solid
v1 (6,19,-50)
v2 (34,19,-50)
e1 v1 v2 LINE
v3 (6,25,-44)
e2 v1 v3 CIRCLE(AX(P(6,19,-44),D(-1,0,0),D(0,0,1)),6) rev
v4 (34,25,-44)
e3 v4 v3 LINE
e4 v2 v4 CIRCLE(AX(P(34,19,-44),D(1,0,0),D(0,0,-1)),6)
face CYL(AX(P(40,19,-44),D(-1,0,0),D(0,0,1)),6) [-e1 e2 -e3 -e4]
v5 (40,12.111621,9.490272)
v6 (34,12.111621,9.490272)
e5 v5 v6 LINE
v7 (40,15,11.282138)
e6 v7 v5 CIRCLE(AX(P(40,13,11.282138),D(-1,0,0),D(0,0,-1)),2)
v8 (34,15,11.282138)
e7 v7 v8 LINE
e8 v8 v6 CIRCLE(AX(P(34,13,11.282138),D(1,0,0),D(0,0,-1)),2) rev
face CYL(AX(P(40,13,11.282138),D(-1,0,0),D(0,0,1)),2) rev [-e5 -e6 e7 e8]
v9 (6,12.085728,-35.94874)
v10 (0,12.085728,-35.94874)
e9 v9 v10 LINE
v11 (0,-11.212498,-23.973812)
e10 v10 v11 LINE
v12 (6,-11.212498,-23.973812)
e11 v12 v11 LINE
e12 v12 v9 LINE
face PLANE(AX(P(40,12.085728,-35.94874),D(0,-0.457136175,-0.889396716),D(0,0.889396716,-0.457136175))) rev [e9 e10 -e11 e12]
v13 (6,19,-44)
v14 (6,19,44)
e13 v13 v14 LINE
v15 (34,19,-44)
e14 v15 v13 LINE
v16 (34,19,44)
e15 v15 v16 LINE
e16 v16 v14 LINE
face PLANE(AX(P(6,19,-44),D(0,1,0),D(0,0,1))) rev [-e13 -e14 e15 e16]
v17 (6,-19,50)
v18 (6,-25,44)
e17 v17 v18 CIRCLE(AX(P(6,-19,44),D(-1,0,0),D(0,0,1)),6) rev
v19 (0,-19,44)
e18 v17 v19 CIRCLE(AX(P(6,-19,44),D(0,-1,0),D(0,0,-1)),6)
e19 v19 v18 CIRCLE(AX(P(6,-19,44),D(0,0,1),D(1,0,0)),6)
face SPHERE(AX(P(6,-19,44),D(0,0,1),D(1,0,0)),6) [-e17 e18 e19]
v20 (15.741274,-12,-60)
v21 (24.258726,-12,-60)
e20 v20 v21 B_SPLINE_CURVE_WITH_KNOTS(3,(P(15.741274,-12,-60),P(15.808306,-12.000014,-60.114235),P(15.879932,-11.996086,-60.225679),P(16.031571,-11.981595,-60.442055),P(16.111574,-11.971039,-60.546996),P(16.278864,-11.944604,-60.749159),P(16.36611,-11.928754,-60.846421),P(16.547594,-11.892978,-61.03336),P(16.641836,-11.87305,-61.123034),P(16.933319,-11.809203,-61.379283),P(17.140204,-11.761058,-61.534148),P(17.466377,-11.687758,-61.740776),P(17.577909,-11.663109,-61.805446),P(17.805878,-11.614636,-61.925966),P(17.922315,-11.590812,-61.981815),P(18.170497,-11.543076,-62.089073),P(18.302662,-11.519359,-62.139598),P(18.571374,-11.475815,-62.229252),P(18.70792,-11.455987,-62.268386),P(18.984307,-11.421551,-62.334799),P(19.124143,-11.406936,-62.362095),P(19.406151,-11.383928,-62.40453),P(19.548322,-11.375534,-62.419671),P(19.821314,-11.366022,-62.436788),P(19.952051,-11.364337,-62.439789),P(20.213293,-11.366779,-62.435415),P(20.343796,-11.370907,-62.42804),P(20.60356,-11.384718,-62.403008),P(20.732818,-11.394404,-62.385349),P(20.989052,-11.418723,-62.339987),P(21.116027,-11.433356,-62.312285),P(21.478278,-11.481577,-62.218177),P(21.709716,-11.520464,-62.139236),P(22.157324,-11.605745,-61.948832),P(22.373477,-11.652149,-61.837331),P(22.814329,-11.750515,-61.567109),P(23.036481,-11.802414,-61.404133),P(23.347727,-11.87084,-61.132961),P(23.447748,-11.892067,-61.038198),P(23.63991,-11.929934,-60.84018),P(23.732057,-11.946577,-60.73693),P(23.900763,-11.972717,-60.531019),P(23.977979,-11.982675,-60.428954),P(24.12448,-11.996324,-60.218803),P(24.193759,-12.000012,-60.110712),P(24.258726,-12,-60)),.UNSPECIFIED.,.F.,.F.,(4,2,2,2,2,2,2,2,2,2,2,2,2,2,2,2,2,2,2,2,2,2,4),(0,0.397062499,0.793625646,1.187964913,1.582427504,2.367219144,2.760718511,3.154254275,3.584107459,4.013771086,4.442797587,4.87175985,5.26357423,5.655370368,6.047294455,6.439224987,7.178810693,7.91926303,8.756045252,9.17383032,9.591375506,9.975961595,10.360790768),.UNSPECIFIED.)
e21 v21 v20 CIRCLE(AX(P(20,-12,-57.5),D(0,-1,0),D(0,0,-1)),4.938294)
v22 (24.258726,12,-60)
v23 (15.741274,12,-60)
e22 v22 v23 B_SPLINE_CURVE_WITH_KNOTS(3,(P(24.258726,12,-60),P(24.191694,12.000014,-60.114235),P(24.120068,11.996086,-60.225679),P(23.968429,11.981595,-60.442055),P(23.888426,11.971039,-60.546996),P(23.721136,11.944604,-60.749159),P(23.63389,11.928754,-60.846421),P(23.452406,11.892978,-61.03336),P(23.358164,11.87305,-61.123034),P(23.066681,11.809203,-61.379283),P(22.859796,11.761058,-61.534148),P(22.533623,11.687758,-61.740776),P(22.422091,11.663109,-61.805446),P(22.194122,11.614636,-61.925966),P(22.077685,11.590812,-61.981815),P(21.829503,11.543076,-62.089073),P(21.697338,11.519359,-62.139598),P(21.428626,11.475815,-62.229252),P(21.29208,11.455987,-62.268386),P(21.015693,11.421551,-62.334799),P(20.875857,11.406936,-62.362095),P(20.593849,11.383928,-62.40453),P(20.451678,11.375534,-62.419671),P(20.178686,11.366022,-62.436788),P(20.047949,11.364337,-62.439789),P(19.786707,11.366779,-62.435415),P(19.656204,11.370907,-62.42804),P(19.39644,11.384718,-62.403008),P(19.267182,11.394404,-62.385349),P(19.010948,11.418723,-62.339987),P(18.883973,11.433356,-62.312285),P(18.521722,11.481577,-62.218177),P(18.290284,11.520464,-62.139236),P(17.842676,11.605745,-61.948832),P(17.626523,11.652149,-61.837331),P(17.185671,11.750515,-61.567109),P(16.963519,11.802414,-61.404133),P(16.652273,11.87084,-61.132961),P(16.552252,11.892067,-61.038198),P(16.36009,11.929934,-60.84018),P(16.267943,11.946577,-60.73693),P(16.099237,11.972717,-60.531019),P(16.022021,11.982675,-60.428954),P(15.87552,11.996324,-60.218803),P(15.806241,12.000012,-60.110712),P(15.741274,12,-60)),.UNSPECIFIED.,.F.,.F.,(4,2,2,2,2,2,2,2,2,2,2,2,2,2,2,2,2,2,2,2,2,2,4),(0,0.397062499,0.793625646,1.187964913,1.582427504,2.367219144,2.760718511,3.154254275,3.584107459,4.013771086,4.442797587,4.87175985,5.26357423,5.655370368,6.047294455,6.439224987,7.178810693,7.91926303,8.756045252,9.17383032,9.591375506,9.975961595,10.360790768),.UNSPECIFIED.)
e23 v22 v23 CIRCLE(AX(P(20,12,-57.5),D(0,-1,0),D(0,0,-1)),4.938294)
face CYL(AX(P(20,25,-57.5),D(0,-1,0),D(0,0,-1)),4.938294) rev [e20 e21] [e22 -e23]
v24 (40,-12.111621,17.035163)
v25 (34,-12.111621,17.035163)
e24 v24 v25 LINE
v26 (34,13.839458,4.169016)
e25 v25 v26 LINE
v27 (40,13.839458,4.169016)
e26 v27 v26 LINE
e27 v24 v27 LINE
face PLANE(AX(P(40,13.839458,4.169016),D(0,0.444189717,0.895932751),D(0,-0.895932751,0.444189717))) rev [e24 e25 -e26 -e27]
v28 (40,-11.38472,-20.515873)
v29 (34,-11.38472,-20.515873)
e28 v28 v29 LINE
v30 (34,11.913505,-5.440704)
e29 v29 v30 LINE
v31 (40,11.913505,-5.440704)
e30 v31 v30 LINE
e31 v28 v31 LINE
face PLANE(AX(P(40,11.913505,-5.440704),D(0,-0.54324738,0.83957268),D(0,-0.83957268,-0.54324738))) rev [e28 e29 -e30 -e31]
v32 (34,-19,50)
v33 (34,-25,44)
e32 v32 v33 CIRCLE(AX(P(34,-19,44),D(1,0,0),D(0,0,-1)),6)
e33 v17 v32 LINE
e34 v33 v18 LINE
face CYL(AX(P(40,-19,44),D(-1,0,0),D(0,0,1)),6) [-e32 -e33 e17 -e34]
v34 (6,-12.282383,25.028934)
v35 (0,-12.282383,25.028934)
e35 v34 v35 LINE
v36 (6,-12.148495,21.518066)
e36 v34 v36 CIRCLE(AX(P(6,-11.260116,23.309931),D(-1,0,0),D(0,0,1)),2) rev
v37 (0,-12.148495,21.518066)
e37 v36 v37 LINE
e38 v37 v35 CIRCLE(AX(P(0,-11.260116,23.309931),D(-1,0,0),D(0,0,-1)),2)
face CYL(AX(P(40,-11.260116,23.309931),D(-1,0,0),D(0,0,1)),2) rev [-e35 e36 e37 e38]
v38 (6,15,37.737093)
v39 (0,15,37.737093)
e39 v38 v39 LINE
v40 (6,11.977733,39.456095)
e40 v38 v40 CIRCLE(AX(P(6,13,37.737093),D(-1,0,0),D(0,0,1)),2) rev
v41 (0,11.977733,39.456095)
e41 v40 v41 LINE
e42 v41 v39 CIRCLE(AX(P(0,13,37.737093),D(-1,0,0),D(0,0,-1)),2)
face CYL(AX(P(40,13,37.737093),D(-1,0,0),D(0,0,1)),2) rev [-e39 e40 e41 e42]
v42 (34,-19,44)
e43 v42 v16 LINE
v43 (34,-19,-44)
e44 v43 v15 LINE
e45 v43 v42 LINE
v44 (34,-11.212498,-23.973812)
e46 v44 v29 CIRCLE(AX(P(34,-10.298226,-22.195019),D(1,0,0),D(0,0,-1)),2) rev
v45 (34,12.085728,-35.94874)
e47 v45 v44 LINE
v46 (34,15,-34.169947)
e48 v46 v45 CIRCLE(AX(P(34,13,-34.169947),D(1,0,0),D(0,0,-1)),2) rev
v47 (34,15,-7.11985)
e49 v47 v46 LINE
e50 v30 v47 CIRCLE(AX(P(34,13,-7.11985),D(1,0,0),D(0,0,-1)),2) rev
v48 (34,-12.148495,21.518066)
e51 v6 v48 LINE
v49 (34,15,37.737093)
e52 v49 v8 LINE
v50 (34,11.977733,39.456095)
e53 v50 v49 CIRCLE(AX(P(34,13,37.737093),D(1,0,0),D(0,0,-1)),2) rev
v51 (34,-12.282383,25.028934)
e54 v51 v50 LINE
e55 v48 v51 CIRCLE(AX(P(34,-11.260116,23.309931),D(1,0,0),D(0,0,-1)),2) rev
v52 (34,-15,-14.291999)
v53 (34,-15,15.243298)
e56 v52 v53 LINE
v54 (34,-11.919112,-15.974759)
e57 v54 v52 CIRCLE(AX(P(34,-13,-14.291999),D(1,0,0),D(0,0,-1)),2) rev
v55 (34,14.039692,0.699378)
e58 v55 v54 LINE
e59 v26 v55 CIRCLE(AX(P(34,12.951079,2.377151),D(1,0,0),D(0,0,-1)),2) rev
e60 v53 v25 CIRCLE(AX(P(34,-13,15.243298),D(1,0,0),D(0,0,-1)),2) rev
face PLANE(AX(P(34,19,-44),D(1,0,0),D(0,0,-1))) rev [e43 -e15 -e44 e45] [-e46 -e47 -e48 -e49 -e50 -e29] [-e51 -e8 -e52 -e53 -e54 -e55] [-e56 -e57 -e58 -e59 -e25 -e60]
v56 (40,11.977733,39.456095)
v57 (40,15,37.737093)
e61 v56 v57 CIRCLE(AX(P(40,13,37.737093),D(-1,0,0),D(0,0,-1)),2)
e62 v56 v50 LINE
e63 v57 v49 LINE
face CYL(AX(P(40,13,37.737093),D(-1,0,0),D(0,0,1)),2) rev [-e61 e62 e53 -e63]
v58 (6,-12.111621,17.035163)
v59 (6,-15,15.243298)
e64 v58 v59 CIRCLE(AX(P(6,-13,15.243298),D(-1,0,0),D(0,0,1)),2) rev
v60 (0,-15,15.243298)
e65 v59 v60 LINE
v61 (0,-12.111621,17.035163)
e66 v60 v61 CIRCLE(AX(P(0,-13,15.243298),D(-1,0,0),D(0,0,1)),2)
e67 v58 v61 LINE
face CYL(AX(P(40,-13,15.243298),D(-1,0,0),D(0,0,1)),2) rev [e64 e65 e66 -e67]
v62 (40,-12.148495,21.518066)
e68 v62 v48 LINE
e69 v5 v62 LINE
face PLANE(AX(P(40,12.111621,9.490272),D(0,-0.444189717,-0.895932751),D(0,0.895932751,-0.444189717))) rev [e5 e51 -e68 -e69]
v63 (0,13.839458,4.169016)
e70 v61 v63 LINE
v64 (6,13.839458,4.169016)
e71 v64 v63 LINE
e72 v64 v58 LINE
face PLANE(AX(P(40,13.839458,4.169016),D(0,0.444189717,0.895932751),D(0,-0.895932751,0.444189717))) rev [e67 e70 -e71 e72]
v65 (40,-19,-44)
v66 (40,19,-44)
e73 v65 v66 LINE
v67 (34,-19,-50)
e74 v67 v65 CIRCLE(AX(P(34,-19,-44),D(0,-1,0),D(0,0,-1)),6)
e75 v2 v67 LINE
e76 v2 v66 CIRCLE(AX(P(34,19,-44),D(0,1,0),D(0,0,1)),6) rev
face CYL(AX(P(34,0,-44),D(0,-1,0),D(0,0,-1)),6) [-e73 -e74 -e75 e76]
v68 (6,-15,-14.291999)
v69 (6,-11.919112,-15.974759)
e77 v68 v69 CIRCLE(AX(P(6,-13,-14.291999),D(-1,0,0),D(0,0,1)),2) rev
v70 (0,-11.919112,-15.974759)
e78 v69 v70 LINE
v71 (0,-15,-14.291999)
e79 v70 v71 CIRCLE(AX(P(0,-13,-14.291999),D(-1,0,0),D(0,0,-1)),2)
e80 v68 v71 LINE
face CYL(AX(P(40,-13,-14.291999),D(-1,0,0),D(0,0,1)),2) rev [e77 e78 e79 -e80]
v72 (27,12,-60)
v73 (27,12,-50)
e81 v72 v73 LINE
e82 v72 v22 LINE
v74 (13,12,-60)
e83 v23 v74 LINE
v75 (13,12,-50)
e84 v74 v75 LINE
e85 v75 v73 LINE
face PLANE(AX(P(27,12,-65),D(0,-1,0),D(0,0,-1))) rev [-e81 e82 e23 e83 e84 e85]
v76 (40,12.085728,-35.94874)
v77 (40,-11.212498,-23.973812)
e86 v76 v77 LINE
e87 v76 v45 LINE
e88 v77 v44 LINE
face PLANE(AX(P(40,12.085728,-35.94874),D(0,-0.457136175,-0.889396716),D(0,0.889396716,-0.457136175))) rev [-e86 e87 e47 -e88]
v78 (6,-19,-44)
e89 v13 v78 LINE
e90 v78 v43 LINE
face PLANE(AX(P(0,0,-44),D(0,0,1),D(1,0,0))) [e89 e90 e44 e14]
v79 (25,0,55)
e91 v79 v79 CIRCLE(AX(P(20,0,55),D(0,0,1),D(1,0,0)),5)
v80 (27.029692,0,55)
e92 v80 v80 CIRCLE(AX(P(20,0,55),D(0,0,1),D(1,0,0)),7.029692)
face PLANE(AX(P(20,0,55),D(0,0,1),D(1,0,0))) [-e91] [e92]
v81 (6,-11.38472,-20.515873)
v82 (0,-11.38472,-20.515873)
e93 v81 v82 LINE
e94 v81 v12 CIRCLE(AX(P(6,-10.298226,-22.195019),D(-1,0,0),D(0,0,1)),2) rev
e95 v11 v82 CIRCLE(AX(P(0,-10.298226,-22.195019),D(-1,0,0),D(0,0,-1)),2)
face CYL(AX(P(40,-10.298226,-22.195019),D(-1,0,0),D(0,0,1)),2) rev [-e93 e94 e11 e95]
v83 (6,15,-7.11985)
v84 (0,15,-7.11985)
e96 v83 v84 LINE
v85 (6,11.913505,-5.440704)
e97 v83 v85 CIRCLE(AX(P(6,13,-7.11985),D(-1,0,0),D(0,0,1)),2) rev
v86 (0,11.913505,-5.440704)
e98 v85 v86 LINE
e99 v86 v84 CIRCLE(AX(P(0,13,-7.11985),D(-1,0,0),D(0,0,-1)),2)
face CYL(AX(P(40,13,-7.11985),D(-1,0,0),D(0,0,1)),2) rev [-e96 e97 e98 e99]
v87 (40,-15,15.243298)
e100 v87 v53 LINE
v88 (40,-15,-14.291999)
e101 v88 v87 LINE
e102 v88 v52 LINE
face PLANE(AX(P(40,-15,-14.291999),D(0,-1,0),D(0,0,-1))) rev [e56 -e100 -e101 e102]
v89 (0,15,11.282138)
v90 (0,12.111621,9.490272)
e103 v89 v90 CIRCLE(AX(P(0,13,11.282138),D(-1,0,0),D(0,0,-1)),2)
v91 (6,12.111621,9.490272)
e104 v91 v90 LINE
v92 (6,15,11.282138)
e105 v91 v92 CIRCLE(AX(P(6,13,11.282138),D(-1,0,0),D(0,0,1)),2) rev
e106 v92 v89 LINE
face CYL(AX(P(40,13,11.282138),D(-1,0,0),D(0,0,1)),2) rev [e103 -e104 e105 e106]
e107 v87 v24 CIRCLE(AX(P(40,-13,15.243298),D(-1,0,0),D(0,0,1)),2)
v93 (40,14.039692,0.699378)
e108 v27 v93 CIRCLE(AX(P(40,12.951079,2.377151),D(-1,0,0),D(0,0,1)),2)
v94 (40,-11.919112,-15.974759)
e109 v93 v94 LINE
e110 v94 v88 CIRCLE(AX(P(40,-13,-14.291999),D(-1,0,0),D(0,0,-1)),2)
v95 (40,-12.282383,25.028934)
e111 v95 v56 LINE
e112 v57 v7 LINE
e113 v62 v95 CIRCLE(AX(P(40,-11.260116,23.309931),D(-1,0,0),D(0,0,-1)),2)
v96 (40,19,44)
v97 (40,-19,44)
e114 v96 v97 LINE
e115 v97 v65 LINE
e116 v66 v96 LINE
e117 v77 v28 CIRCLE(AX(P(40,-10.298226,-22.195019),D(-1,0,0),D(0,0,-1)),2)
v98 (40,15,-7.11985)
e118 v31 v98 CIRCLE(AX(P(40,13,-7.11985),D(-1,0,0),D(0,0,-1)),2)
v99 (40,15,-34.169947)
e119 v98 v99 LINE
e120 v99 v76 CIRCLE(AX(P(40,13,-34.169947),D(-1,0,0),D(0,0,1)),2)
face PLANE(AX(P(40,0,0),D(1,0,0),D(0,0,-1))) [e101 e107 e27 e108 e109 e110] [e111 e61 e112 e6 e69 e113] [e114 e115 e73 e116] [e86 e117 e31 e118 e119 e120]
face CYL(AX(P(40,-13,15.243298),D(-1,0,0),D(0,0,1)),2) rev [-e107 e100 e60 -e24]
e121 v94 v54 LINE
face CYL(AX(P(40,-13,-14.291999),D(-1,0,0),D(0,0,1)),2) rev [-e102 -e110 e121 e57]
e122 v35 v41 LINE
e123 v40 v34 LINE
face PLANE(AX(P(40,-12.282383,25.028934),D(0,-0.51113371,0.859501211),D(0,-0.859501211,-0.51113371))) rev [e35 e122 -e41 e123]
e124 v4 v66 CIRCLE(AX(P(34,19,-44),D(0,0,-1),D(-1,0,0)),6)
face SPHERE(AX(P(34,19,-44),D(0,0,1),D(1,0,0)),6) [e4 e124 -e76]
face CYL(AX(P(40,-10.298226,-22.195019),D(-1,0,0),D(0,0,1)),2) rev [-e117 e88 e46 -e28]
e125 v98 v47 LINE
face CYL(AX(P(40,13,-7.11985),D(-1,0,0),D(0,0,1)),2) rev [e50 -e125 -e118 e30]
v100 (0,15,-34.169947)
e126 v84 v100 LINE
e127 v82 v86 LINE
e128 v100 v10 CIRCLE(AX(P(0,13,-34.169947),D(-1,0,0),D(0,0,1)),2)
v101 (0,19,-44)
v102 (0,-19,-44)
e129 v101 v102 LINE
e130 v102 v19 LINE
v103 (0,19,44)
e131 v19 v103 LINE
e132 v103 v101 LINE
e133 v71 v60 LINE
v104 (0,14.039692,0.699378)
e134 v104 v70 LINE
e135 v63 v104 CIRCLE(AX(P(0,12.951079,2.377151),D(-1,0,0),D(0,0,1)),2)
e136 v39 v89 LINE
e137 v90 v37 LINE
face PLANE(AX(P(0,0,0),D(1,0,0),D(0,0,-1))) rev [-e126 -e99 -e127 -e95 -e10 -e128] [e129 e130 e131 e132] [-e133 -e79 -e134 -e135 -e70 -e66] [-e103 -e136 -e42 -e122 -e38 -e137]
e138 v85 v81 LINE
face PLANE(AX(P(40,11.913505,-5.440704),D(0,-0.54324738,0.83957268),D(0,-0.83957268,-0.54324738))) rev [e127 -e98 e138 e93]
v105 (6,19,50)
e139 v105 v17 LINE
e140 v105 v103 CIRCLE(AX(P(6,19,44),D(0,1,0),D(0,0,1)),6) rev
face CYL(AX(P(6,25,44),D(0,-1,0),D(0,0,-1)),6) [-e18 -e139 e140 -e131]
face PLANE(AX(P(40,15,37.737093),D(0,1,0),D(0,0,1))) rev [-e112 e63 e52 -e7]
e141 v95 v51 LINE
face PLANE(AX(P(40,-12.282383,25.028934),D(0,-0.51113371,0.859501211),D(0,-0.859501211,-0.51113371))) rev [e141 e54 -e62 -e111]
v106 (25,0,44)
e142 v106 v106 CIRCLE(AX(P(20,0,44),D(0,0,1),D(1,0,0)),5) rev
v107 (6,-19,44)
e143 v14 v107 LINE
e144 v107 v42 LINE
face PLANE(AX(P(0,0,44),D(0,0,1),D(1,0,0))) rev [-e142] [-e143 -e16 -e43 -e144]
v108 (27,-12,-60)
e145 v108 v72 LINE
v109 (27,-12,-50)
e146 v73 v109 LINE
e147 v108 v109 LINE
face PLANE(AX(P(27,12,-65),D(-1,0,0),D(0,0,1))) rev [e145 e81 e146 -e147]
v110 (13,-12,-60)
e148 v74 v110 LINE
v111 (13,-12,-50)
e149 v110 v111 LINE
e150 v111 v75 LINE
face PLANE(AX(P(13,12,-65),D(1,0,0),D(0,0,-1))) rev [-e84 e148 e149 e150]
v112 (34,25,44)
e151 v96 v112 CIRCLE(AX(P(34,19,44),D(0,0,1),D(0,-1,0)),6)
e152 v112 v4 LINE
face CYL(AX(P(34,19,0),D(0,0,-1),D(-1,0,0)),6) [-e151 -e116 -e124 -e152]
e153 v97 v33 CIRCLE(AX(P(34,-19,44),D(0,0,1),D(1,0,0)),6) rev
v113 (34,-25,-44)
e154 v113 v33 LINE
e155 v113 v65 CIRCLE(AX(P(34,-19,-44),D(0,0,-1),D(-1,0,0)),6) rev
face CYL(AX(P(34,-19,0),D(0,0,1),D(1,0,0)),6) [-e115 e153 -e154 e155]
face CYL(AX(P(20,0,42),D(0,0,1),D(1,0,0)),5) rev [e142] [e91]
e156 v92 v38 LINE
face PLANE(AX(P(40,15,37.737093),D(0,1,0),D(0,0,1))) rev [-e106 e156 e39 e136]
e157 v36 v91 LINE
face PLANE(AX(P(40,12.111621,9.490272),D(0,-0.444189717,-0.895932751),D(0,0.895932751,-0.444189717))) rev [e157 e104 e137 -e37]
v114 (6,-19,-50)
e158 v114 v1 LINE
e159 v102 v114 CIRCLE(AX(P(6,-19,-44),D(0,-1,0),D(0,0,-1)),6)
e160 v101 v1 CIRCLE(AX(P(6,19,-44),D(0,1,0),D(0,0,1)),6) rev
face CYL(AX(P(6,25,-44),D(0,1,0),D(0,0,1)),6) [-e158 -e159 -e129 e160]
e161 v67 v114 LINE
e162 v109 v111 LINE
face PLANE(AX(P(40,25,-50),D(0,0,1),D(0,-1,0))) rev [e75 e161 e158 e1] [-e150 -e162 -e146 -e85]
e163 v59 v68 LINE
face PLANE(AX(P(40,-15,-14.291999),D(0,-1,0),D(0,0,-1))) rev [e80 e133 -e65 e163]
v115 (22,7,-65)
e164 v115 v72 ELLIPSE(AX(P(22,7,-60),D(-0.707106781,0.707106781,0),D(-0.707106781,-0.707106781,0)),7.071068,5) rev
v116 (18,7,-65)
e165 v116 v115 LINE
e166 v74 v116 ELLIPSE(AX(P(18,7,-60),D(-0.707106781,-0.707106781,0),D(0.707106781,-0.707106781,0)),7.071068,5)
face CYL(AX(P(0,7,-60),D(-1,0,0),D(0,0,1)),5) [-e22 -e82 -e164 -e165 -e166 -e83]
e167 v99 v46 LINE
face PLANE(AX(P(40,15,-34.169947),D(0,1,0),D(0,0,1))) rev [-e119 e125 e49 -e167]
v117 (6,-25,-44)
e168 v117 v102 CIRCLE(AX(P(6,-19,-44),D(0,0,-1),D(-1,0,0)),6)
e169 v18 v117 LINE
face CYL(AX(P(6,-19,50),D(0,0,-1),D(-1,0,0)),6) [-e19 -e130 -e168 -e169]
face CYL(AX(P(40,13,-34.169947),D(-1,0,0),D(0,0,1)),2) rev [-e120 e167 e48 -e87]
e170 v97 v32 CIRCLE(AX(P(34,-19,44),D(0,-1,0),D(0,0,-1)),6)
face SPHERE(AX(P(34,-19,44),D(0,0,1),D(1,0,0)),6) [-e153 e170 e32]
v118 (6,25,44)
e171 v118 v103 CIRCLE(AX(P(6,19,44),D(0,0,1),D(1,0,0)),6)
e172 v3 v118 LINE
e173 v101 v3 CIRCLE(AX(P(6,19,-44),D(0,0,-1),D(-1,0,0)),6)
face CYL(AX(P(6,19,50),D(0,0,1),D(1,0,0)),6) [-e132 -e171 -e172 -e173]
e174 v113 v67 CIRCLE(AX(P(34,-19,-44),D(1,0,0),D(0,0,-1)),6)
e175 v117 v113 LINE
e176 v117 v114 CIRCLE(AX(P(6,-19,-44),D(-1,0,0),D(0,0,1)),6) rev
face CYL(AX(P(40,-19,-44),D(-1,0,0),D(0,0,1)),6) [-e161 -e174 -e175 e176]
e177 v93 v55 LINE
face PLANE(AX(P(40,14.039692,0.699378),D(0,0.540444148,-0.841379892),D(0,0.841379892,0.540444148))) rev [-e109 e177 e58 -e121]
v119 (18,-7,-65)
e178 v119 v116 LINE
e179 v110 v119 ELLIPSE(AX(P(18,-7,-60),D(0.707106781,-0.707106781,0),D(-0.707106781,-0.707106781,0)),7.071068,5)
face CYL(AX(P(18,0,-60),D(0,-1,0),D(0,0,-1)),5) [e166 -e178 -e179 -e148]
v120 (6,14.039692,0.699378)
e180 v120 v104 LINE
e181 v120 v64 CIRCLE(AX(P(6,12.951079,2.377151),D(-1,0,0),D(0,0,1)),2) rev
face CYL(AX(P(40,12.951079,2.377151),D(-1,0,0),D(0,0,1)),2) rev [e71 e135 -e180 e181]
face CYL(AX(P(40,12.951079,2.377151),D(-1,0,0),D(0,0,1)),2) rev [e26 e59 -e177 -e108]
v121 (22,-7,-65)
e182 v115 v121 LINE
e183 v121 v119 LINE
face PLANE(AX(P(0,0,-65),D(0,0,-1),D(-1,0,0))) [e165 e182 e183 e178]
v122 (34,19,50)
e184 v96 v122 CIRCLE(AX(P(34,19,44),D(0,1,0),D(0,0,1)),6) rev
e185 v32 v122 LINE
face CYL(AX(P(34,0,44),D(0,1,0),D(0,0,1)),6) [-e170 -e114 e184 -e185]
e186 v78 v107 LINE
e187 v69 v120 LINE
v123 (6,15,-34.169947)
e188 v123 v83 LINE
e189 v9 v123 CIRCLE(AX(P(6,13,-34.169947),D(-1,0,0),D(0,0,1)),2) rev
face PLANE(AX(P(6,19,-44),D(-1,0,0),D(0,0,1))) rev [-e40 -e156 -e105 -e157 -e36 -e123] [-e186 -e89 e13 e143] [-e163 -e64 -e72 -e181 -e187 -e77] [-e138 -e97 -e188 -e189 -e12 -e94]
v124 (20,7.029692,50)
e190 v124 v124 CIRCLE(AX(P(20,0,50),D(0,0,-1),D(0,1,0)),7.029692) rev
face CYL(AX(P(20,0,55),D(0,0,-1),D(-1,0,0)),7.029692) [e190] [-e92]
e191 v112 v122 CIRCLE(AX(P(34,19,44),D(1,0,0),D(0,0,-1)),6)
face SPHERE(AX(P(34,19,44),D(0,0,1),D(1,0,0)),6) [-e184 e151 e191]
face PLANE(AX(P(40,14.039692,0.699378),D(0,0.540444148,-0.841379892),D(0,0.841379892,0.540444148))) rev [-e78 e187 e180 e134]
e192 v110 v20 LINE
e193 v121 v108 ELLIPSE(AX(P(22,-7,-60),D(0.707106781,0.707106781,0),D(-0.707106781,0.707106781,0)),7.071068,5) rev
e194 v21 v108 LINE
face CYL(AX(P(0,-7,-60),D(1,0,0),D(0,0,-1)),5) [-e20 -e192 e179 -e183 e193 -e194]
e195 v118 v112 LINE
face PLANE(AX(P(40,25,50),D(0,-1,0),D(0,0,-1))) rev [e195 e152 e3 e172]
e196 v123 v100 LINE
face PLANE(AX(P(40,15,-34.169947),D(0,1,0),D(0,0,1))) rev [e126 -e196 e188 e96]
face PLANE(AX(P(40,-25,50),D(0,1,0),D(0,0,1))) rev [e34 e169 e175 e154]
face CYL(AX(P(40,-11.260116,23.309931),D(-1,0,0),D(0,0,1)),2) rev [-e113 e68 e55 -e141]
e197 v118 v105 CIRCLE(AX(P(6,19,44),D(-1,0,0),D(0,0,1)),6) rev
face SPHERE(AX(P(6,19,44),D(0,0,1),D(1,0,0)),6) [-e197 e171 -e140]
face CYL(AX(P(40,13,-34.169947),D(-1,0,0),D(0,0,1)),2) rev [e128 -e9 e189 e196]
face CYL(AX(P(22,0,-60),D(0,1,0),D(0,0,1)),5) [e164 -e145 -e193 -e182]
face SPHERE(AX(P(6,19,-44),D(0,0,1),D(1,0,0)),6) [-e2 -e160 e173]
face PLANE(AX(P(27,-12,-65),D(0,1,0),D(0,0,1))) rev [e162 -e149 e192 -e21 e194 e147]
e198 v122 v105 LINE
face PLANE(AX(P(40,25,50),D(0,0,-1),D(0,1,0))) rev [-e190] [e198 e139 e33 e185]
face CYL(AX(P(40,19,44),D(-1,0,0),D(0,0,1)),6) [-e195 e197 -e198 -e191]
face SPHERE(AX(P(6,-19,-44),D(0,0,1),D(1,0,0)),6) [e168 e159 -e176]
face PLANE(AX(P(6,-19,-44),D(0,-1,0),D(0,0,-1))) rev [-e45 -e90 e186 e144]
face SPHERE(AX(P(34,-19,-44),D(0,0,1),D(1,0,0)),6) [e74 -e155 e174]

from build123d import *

# Parameters (mm, degrees)
SKETCH1_W           = 100
SKETCH1_H           = 50
BOSS_EXTRUDE1_DEPTH = 40
FILLET1_R           = 6
SKETCH4_R           = 5
CUT_EXTRUDE2_DEPTH  = 8
CUT_EXTRUDE4_DEPTH  = 69.738635424
SKETCH29_W          = 14
SKETCH29_H          = 24
BOSS_EXTRUDE2_DEPTH = 15
SKETCH31_R          = 4.938293982
CUT_EXTRUDE6_DEPTH  = 85.817451035
FILLET7_R           = 5
SKETCH32_W          = 28
SKETCH32_H          = 38
CUT_EXTRUDE7_DEPTH  = 88
BOSS_EXTRUDE3_START = 5
SKETCH33_R          = 7.029692419
SKETCH33_R_2        = 5
BOSS_EXTRUDE3_DEPTH = 5


with BuildPart() as part:
    # Sketch1 → Boss-Extrude1 (new body)
    with BuildSketch(Plane(origin=(0, 0, 0), x_dir=(0, 0, -1), z_dir=(1, 0, 0))):
        Rectangle(SKETCH1_W, SKETCH1_H)
    extrude(amount=BOSS_EXTRUDE1_DEPTH)

    # Fillet1
    fillet1_edges = [part.edges().sort_by_distance(p)[0] for p in [
        (40, 0, 50),
        (40, -25, 0),
        (40, 0, -50),
        (0, -25, 0),
        (0, 0, 50),
        (0, 25, 0),
        (0, 0, -50),
        (20, -25, -50),
        (20, -25, 50),
        (20, 25, 50),
        (20, 25, -50),
        (40, 25, 0),
    ]]
    fillet(fillet1_edges, radius=FILLET1_R)

    # Sketch4 → Cut-Extrude2 (cut)
    with BuildSketch(Plane.XY.offset(50)):
        with Locations((20, 0)):
            Circle(SKETCH4_R)
    extrude(amount=-CUT_EXTRUDE2_DEPTH, mode=Mode.SUBTRACT)

    # Sketch27 → Cut-Extrude4 (cut, through all)
    with BuildSketch(Plane.ZY):
        with BuildLine():
            Line((-35.948740213, 12.085727651), (-23.973812043, -11.212498079))
            ThreePointArc((-23.973812043, -11.212498079), (-22.294505165, -12.295749804), (-20.515873253, -11.384720489))
            Line((-20.515873253, -11.384720489), (-5.440704193, 11.91350524))
            ThreePointArc((-5.440704193, 11.91350524), (-5.363007282, 13.955774681), (-7.119849552, 15))
            Line((-7.119849552, 15), (-34.169946782, 15))
            ThreePointArc((-34.169946782, 15), (-35.877070781, 14.041982558), (-35.948740213, 12.085727651))
        make_face()
        with BuildLine():
            Line((4.169016264, 13.839458065), (17.035163046, -12.111620565))
            ThreePointArc((17.035163046, -12.111620565), (16.94282084, -14.054334181), (15.243297544, -15))
            Line((15.243297544, -15), (-14.291999001, -15))
            ThreePointArc((-14.291999001, -15), (-16.047244937, -13.958703137), (-15.974758786, -11.919111705))
            Line((-15.974758786, -11.919111705), (0.699377924, 14.039691649))
            ThreePointArc((0.699377924, 14.039691649), (2.492379474, 14.947756457), (4.169016264, 13.839458065))
        make_face()
        with BuildLine():
            Line((9.490272401, 12.111620565), (21.518065714, -12.148495172))
            ThreePointArc((21.518065714, -12.148495172), (23.233716027, -13.258663021), (25.028933638, -12.282383156))
            Line((25.028933638, -12.282383156), (39.456095343, 11.977732581))
            ThreePointArc((39.456095343, 11.977732581), (39.475559896, 13.988803611), (37.737092922, 15))
            Line((37.737092922, 15), (11.282137904, 15))
            ThreePointArc((11.282137904, 15), (9.582614607, 14.054334181), (9.490272401, 12.111620565))
        make_face()
    extrude(amount=-CUT_EXTRUDE4_DEPTH, mode=Mode.SUBTRACT)

    # Sketch29 → Boss-Extrude2 (add)
    with BuildSketch(Plane(origin=(0, 0, -50), x_dir=(-1, 0, 0), z_dir=(0, 0, -1))):
        with Locations((-20, 0)):
            Rectangle(SKETCH29_W, SKETCH29_H)
    extrude(amount=BOSS_EXTRUDE2_DEPTH)

    # Sketch31 → Cut-Extrude6 (cut, through all)
    with BuildSketch(Plane.XZ.offset(12)):
        with Locations(Location((20, -57.5, 0), (0, 0, 270))):
            Circle(SKETCH31_R)
    extrude(amount=-CUT_EXTRUDE6_DEPTH, mode=Mode.SUBTRACT)

    # Fillet7
    # the kernel refuses this fillet: 5 mm, written as the material it takes off along each edge
    with BuildSketch(Plane(origin=(13, 24.5, -65), x_dir=(0, 0, 1), z_dir=(0, -1, 0)), Plane(origin=(27, -24.5, -65), x_dir=(0, 0, 1), z_dir=(0, 1, 0))) as fillet7_piece_1:
        with BuildLine():
            CenterArc((FILLET7_R, -FILLET7_R), FILLET7_R, 90, 90)
            Line((0, -FILLET7_R), (0, 0))
            Line((0, 0), (FILLET7_R, 0))
        make_face()
    extrude(amount=49, mode=Mode.SUBTRACT)
    with BuildSketch(Plane(origin=(39.5, 12, -65), x_dir=(0, 0, 1), z_dir=(-1, 0, 0)), Plane(origin=(0.5, -12, -65), x_dir=(0, 0, 1), z_dir=(1, 0, 0))) as fillet7_piece_2:
        with BuildLine():
            CenterArc((FILLET7_R, -FILLET7_R), FILLET7_R, 90, 90)
            Line((0, -FILLET7_R), (0, 0))
            Line((0, 0), (FILLET7_R, 0))
        make_face()
    extrude(amount=39, mode=Mode.SUBTRACT)

    # Sketch32 → Cut-Extrude7 (cut)
    with BuildSketch(Plane.XY.offset(44)):
        with Locations((20, 0)):
            Rectangle(SKETCH32_W, SKETCH32_H)
    extrude(amount=-CUT_EXTRUDE7_DEPTH, mode=Mode.SUBTRACT)

    # Sketch33 → Boss-Extrude3 (add)
    with BuildSketch(Plane.XY.offset(50).offset(BOSS_EXTRUDE3_START)):
        with Locations(Location((20, 0, 0), (0, 0, 90))):
            Circle(SKETCH33_R)
        with Locations((20, 0)):
            Circle(SKETCH33_R_2, mode=Mode.SUBTRACT)
    extrude(amount=-BOSS_EXTRUDE3_DEPTH)


solid = part.part
